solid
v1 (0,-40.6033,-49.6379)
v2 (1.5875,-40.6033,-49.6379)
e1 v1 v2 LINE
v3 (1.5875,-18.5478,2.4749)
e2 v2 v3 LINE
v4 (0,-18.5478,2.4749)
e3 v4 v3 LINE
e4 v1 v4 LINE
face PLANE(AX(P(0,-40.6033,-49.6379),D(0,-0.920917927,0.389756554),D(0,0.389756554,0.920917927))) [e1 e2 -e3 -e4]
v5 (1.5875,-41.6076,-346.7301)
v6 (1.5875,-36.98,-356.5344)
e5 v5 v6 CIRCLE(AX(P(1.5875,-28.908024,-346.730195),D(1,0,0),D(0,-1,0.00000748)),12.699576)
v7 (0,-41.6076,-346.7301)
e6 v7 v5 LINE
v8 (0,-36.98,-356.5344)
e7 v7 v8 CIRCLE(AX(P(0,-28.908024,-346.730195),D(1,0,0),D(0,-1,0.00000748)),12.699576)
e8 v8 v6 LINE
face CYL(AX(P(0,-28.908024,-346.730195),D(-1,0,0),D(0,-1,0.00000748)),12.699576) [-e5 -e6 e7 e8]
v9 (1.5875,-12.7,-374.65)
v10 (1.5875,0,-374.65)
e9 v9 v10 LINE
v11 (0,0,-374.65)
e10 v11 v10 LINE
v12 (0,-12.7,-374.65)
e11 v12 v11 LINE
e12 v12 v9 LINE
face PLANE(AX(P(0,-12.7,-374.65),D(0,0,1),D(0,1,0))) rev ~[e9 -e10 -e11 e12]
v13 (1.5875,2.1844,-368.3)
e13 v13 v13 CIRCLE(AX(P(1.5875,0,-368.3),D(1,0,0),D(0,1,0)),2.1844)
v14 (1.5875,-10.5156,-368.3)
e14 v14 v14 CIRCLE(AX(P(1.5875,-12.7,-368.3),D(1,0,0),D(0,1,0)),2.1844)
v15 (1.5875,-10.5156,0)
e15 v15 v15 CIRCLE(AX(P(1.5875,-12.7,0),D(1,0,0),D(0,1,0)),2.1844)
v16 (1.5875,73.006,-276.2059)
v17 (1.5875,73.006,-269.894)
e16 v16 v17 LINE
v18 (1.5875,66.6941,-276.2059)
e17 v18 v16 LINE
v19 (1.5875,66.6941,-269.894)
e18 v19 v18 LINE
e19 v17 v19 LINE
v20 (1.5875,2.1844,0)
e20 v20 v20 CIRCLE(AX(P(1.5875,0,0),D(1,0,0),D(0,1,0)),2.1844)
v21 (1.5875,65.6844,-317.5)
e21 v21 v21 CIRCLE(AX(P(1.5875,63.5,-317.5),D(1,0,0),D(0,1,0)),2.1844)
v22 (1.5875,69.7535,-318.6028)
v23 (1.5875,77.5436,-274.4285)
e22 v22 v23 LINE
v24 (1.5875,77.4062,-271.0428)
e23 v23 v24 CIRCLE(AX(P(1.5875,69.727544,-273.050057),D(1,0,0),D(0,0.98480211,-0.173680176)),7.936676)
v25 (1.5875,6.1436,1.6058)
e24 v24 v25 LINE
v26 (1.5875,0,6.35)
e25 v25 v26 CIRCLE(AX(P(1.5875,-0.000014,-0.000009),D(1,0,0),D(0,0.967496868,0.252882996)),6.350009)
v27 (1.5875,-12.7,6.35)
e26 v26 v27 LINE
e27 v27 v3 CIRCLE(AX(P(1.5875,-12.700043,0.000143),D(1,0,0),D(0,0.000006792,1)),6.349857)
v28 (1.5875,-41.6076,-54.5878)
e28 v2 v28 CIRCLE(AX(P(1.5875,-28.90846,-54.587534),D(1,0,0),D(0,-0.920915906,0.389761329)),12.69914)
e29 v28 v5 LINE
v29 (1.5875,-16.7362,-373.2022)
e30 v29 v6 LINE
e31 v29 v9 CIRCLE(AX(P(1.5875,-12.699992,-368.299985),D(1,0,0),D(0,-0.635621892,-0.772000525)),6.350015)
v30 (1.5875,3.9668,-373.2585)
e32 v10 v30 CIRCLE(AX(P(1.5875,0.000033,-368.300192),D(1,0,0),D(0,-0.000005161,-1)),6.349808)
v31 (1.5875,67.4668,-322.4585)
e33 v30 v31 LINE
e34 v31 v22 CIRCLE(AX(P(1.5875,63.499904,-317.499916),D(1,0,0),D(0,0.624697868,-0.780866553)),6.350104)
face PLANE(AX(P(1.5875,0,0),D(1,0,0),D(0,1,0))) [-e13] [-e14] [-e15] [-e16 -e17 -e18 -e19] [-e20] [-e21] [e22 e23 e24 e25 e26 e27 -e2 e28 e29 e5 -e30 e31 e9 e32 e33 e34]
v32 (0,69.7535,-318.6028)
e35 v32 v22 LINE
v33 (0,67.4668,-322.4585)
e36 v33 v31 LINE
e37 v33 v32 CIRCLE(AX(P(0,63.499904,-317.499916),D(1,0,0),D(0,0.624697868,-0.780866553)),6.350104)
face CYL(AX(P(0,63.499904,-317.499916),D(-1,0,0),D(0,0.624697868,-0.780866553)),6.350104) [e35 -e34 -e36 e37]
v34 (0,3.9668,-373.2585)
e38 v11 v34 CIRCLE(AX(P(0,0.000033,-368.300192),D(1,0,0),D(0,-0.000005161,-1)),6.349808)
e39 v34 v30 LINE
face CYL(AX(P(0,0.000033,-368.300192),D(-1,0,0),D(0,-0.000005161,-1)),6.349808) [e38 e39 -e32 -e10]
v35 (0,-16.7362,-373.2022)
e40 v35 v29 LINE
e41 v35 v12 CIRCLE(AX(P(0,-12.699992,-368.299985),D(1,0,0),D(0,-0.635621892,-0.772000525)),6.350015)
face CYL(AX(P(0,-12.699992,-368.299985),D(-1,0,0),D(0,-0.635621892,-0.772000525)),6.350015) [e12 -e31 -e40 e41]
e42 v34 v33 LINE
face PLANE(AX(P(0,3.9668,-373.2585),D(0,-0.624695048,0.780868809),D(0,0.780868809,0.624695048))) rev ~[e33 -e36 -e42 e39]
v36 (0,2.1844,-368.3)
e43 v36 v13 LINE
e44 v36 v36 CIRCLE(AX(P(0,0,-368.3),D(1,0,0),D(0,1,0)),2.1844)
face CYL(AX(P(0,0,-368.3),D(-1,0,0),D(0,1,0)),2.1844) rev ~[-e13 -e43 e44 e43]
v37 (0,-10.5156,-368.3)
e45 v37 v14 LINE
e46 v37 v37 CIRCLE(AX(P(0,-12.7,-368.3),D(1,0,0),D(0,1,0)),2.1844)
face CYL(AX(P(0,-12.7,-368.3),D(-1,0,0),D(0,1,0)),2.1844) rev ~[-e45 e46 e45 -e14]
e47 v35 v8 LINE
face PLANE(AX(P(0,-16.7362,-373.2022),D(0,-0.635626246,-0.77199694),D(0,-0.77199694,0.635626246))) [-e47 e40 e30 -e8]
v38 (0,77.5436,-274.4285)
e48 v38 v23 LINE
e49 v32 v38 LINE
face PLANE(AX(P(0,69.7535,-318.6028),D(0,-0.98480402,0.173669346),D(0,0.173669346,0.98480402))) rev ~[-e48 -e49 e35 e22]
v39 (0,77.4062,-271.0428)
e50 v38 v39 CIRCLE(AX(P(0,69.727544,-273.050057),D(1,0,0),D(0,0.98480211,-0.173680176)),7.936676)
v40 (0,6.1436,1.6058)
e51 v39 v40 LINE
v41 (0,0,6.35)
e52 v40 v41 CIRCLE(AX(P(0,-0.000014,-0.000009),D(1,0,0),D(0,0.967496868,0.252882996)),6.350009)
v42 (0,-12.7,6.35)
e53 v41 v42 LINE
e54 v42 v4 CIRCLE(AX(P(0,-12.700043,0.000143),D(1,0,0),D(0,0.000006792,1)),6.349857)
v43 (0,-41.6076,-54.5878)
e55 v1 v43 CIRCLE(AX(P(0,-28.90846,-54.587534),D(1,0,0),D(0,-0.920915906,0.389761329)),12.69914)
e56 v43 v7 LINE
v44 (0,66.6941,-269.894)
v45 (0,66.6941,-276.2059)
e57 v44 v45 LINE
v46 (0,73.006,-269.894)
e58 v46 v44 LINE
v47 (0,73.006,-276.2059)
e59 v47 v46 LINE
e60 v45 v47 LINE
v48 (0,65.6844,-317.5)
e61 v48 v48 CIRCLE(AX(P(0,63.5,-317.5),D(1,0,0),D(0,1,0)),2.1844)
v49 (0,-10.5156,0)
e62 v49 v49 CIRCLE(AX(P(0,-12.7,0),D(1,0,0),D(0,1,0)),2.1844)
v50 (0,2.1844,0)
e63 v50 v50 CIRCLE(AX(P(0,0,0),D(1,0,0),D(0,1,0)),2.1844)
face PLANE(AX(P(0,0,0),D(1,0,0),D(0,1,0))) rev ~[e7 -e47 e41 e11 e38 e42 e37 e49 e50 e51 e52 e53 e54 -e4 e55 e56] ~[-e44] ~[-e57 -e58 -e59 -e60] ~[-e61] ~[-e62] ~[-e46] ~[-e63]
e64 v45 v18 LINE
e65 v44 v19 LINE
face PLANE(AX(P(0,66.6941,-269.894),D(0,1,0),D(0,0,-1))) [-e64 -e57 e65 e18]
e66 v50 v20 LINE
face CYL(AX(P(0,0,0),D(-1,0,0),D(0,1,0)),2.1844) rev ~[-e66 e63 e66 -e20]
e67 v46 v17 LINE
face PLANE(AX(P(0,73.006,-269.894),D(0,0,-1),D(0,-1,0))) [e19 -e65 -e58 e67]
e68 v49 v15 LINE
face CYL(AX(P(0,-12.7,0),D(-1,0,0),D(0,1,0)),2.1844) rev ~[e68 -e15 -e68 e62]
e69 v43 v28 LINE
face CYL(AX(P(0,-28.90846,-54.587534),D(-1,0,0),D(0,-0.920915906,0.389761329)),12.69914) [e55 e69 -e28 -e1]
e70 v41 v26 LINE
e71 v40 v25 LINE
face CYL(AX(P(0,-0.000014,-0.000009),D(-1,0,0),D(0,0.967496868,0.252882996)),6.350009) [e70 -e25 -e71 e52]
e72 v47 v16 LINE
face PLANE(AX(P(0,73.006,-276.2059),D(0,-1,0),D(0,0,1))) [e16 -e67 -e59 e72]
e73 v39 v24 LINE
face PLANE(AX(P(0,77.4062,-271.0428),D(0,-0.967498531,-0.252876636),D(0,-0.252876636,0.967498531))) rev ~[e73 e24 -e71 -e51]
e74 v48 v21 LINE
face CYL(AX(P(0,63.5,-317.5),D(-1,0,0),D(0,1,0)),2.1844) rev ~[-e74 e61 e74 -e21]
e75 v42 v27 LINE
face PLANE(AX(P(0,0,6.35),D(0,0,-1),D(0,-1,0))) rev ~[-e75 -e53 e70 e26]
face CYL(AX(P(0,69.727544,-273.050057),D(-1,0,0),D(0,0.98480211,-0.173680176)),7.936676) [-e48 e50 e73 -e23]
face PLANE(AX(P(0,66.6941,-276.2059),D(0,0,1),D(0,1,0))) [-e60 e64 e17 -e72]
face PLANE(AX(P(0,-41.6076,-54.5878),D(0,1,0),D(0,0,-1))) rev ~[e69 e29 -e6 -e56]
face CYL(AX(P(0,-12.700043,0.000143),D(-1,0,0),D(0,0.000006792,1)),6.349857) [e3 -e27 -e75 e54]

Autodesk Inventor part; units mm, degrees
ref_plane "YZ Plane" through (0, 0, 0) normal (1, 0, 0) x (0, 1, 0)
ref_plane "XZ Plane" through (0, 0, 0) normal (0, 1, 0) x (-1, 0, 0)
ref_plane "XY Plane" through (0, 0, 0) normal (0, 0, 1) x (1, 0, 0)
sketch "maiin" plane through (0, 0, 0) normal (0, 0, 1) x (1, 0, 0)
  circle A0 centre (114.3234, 350.4213) radius 2.1844
  circle A1 centre (127.0234, 350.4213) radius 2.1844
  line L0 (86.4201, 300.7833) -> (108.4755, 352.8962)
  arc A2 (86.4201, 300.7833) -> (85.4157, 295.8335) centre (98.1157, 295.8335) ccw
  line L1 (209.5734, 102.7713) -> (133.0946, 352.2822)
  line L2 (209.5734, 96.4213) -> (209.5734, 102.7713)
  circle A3 centre (203.2234, 96.4213) radius 2.1844
  arc A4 (209.45, 95.176) -> (209.5734, 96.4213) centre (203.2234, 96.4213) ccw
  line L3 (196.75, 31.676) -> (209.45, 95.176)
  circle A5 centre (190.5234, 32.9213) radius 2.1844
  line L4 (85.4157, 295.8335) -> (85.4157, 3.6912)
  circle A6 centre (127.0234, -17.8787) radius 2.1844
  circle A7 centre (114.3234, -17.8787) radius 2.1844
  arc A8 (127.0234, -24.2287) -> (130.9902, -22.8372) centre (127.0234, -17.8787) ccw
  arc A9 (110.2871, -22.7809) -> (114.3234, -24.2287) centre (114.3234, -17.8787) ccw
  arc A10 (194.4902, 27.9628) -> (196.75, 31.676) centre (190.5234, 32.9213) ccw
  arc A11 (85.4157, 3.6912) -> (90.0433, -6.1132) centre (98.1157, 3.6912) ccw
  line L5 (130.9902, -22.8372) -> (194.4902, 27.9628)
  line L6 (110.2871, -22.7809) -> (90.0433, -6.1132)
  line L7 (114.3234, -24.2287) -> (127.0234, -24.2287)
  arc A12 (114.3234, 356.7713) -> (108.4755, 352.8962) centre (114.3234, 350.4213) ccw
  line L8 (127.0234, 356.7713) -> (114.3234, 356.7713)
  arc A13 (133.0946, 352.2822) -> (127.0234, 356.7713) centre (127.0234, 350.4213) ccw
  point P0 (137.6055, 139.9011)
  point P1 (110.8157, 355.7146)
  dimension "d0" = 12.7
  dimension "d1" = 12.7
  dimension "d2" = 25.4
sketch "main" plane through (0, 0, 0) normal (0, 0, 1) x (1, 0, 0)
  line L0 (253.2515, -237.7425) -> (261.0416, -193.5682)
  circle A0 centre (170.798, 80.8603) radius 2.1844
  circle A1 centre (183.498, 80.8603) radius 2.1844
  circle A2 centre (246.998, -236.6397) radius 2.1844
  arc A3 (189.6416, 82.4661) -> (183.498, 87.2103) centre (183.498, 80.8603) ccw
  arc A4 (170.798, 87.2103) -> (164.9502, 83.3353) centre (170.798, 80.8603) ccw
  line L1 (183.498, 87.2103) -> (170.798, 87.2103)
  line L2 (141.8904, 26.2725) -> (141.8904, -265.8697)
  line L3 (260.9042, -190.1825) -> (189.6416, 82.4661)
  arc A5 (142.8948, 31.2224) -> (141.8904, 26.2725) centre (154.5904, 26.2725) ccw
  line L4 (142.8948, 31.2224) -> (164.9502, 83.3353)
  arc A6 (250.9648, -241.5982) -> (253.2515, -237.7425) centre (246.998, -236.6397) ccw
  line L5 (187.4648, -292.3982) -> (250.9648, -241.5982)
  circle A7 centre (183.498, -287.4397) radius 2.1844
  arc A8 (183.498, -293.7897) -> (187.4648, -292.3982) centre (183.498, -287.4397) ccw
  circle A9 centre (170.798, -287.4397) radius 2.1844
  line L6 (170.798, -293.7897) -> (183.498, -293.7897)
  arc A10 (166.7618, -292.3419) -> (170.798, -293.7897) centre (170.798, -287.4397) ccw
  arc A11 (141.8904, -265.8697) -> (146.518, -275.6741) centre (154.5904, -265.8697) ccw
  line L7 (166.7618, -292.3419) -> (146.518, -275.6741)
  arc A12 (261.0416, -193.5682) -> (260.9042, -190.1825) centre (253.2247, -192.1897) ccw
  point P0 (195.6606, -131.3273)
  point P1 (167.2904, 86.1536)
  dimension "d6" = 12.7
  dimension "d7" = 25.4
  dimension "d10" = 15.875
sketch "Sketch1" plane through (0, 0, 0) normal (1, 0, 0) x (0, 1, 0)
  line L0 (73.006, -269.894) -> (66.6941, -269.894)
  line L1 (66.6941, -269.894) -> (66.6941, -276.2059)
  line L2 (66.6941, -276.2059) -> (73.006, -276.2059)
  line L3 (73.006, -276.2059) -> (73.006, -269.894)
  line L4 (73.006, -269.894) -> (66.6941, -276.2059) construction
  line L5 (66.6941, -269.894) -> (73.006, -276.2059) construction
  line L6 (69.7535, -318.6028) -> (77.5436, -274.4285)
  circle A0 centre (-12.7, 0) radius 2.1844
  circle A1 centre (0, 0) radius 2.1844
  circle A2 centre (63.5, -317.5) radius 2.1844
  arc A3 (6.1436, 1.6058) -> (0, 6.35) centre (0, 0) ccw
  arc A4 (-12.7, 6.35) -> (-18.5478, 2.4749) centre (-12.7, 0) ccw
  line L7 (0, 6.35) -> (-12.7, 6.35)
  line L8 (-41.6076, -54.5878) -> (-41.6076, -346.7301)
  line L9 (77.4062, -271.0428) -> (6.1436, 1.6058)
  arc A5 (-40.6033, -49.6379) -> (-41.6076, -54.5878) centre (-28.9076, -54.5878) ccw
  line L10 (-40.6033, -49.6379) -> (-18.5478, 2.4749)
  arc A6 (67.4668, -322.4585) -> (69.7535, -318.6028) centre (63.5, -317.5) ccw
  line L11 (3.9668, -373.2585) -> (67.4668, -322.4585)
  circle A7 centre (0, -368.3) radius 2.1844
  arc A8 (0, -374.65) -> (3.9668, -373.2585) centre (0, -368.3) ccw
  circle A9 centre (-12.7, -368.3) radius 2.1844
  line L12 (-12.7, -374.65) -> (0, -374.65)
  arc A10 (-16.7362, -373.2022) -> (-12.7, -374.65) centre (-12.7, -368.3) ccw
  arc A11 (-41.6076, -346.7301) -> (-36.98, -356.5344) centre (-28.9076, -346.7301) ccw
  line L13 (-16.7362, -373.2022) -> (-36.98, -356.5344)
  arc A12 (77.5436, -274.4285) -> (77.4062, -271.0428) centre (69.7267, -273.05) ccw
  point P0 (69.85, -273.05)
  dimension "d8" = 6.3119
  dimension "d9" = 6.3119
extrude "Extrusion1" add sketch "Sketch1" along normal blind 1.5875
properties part number "skirt_updated"
